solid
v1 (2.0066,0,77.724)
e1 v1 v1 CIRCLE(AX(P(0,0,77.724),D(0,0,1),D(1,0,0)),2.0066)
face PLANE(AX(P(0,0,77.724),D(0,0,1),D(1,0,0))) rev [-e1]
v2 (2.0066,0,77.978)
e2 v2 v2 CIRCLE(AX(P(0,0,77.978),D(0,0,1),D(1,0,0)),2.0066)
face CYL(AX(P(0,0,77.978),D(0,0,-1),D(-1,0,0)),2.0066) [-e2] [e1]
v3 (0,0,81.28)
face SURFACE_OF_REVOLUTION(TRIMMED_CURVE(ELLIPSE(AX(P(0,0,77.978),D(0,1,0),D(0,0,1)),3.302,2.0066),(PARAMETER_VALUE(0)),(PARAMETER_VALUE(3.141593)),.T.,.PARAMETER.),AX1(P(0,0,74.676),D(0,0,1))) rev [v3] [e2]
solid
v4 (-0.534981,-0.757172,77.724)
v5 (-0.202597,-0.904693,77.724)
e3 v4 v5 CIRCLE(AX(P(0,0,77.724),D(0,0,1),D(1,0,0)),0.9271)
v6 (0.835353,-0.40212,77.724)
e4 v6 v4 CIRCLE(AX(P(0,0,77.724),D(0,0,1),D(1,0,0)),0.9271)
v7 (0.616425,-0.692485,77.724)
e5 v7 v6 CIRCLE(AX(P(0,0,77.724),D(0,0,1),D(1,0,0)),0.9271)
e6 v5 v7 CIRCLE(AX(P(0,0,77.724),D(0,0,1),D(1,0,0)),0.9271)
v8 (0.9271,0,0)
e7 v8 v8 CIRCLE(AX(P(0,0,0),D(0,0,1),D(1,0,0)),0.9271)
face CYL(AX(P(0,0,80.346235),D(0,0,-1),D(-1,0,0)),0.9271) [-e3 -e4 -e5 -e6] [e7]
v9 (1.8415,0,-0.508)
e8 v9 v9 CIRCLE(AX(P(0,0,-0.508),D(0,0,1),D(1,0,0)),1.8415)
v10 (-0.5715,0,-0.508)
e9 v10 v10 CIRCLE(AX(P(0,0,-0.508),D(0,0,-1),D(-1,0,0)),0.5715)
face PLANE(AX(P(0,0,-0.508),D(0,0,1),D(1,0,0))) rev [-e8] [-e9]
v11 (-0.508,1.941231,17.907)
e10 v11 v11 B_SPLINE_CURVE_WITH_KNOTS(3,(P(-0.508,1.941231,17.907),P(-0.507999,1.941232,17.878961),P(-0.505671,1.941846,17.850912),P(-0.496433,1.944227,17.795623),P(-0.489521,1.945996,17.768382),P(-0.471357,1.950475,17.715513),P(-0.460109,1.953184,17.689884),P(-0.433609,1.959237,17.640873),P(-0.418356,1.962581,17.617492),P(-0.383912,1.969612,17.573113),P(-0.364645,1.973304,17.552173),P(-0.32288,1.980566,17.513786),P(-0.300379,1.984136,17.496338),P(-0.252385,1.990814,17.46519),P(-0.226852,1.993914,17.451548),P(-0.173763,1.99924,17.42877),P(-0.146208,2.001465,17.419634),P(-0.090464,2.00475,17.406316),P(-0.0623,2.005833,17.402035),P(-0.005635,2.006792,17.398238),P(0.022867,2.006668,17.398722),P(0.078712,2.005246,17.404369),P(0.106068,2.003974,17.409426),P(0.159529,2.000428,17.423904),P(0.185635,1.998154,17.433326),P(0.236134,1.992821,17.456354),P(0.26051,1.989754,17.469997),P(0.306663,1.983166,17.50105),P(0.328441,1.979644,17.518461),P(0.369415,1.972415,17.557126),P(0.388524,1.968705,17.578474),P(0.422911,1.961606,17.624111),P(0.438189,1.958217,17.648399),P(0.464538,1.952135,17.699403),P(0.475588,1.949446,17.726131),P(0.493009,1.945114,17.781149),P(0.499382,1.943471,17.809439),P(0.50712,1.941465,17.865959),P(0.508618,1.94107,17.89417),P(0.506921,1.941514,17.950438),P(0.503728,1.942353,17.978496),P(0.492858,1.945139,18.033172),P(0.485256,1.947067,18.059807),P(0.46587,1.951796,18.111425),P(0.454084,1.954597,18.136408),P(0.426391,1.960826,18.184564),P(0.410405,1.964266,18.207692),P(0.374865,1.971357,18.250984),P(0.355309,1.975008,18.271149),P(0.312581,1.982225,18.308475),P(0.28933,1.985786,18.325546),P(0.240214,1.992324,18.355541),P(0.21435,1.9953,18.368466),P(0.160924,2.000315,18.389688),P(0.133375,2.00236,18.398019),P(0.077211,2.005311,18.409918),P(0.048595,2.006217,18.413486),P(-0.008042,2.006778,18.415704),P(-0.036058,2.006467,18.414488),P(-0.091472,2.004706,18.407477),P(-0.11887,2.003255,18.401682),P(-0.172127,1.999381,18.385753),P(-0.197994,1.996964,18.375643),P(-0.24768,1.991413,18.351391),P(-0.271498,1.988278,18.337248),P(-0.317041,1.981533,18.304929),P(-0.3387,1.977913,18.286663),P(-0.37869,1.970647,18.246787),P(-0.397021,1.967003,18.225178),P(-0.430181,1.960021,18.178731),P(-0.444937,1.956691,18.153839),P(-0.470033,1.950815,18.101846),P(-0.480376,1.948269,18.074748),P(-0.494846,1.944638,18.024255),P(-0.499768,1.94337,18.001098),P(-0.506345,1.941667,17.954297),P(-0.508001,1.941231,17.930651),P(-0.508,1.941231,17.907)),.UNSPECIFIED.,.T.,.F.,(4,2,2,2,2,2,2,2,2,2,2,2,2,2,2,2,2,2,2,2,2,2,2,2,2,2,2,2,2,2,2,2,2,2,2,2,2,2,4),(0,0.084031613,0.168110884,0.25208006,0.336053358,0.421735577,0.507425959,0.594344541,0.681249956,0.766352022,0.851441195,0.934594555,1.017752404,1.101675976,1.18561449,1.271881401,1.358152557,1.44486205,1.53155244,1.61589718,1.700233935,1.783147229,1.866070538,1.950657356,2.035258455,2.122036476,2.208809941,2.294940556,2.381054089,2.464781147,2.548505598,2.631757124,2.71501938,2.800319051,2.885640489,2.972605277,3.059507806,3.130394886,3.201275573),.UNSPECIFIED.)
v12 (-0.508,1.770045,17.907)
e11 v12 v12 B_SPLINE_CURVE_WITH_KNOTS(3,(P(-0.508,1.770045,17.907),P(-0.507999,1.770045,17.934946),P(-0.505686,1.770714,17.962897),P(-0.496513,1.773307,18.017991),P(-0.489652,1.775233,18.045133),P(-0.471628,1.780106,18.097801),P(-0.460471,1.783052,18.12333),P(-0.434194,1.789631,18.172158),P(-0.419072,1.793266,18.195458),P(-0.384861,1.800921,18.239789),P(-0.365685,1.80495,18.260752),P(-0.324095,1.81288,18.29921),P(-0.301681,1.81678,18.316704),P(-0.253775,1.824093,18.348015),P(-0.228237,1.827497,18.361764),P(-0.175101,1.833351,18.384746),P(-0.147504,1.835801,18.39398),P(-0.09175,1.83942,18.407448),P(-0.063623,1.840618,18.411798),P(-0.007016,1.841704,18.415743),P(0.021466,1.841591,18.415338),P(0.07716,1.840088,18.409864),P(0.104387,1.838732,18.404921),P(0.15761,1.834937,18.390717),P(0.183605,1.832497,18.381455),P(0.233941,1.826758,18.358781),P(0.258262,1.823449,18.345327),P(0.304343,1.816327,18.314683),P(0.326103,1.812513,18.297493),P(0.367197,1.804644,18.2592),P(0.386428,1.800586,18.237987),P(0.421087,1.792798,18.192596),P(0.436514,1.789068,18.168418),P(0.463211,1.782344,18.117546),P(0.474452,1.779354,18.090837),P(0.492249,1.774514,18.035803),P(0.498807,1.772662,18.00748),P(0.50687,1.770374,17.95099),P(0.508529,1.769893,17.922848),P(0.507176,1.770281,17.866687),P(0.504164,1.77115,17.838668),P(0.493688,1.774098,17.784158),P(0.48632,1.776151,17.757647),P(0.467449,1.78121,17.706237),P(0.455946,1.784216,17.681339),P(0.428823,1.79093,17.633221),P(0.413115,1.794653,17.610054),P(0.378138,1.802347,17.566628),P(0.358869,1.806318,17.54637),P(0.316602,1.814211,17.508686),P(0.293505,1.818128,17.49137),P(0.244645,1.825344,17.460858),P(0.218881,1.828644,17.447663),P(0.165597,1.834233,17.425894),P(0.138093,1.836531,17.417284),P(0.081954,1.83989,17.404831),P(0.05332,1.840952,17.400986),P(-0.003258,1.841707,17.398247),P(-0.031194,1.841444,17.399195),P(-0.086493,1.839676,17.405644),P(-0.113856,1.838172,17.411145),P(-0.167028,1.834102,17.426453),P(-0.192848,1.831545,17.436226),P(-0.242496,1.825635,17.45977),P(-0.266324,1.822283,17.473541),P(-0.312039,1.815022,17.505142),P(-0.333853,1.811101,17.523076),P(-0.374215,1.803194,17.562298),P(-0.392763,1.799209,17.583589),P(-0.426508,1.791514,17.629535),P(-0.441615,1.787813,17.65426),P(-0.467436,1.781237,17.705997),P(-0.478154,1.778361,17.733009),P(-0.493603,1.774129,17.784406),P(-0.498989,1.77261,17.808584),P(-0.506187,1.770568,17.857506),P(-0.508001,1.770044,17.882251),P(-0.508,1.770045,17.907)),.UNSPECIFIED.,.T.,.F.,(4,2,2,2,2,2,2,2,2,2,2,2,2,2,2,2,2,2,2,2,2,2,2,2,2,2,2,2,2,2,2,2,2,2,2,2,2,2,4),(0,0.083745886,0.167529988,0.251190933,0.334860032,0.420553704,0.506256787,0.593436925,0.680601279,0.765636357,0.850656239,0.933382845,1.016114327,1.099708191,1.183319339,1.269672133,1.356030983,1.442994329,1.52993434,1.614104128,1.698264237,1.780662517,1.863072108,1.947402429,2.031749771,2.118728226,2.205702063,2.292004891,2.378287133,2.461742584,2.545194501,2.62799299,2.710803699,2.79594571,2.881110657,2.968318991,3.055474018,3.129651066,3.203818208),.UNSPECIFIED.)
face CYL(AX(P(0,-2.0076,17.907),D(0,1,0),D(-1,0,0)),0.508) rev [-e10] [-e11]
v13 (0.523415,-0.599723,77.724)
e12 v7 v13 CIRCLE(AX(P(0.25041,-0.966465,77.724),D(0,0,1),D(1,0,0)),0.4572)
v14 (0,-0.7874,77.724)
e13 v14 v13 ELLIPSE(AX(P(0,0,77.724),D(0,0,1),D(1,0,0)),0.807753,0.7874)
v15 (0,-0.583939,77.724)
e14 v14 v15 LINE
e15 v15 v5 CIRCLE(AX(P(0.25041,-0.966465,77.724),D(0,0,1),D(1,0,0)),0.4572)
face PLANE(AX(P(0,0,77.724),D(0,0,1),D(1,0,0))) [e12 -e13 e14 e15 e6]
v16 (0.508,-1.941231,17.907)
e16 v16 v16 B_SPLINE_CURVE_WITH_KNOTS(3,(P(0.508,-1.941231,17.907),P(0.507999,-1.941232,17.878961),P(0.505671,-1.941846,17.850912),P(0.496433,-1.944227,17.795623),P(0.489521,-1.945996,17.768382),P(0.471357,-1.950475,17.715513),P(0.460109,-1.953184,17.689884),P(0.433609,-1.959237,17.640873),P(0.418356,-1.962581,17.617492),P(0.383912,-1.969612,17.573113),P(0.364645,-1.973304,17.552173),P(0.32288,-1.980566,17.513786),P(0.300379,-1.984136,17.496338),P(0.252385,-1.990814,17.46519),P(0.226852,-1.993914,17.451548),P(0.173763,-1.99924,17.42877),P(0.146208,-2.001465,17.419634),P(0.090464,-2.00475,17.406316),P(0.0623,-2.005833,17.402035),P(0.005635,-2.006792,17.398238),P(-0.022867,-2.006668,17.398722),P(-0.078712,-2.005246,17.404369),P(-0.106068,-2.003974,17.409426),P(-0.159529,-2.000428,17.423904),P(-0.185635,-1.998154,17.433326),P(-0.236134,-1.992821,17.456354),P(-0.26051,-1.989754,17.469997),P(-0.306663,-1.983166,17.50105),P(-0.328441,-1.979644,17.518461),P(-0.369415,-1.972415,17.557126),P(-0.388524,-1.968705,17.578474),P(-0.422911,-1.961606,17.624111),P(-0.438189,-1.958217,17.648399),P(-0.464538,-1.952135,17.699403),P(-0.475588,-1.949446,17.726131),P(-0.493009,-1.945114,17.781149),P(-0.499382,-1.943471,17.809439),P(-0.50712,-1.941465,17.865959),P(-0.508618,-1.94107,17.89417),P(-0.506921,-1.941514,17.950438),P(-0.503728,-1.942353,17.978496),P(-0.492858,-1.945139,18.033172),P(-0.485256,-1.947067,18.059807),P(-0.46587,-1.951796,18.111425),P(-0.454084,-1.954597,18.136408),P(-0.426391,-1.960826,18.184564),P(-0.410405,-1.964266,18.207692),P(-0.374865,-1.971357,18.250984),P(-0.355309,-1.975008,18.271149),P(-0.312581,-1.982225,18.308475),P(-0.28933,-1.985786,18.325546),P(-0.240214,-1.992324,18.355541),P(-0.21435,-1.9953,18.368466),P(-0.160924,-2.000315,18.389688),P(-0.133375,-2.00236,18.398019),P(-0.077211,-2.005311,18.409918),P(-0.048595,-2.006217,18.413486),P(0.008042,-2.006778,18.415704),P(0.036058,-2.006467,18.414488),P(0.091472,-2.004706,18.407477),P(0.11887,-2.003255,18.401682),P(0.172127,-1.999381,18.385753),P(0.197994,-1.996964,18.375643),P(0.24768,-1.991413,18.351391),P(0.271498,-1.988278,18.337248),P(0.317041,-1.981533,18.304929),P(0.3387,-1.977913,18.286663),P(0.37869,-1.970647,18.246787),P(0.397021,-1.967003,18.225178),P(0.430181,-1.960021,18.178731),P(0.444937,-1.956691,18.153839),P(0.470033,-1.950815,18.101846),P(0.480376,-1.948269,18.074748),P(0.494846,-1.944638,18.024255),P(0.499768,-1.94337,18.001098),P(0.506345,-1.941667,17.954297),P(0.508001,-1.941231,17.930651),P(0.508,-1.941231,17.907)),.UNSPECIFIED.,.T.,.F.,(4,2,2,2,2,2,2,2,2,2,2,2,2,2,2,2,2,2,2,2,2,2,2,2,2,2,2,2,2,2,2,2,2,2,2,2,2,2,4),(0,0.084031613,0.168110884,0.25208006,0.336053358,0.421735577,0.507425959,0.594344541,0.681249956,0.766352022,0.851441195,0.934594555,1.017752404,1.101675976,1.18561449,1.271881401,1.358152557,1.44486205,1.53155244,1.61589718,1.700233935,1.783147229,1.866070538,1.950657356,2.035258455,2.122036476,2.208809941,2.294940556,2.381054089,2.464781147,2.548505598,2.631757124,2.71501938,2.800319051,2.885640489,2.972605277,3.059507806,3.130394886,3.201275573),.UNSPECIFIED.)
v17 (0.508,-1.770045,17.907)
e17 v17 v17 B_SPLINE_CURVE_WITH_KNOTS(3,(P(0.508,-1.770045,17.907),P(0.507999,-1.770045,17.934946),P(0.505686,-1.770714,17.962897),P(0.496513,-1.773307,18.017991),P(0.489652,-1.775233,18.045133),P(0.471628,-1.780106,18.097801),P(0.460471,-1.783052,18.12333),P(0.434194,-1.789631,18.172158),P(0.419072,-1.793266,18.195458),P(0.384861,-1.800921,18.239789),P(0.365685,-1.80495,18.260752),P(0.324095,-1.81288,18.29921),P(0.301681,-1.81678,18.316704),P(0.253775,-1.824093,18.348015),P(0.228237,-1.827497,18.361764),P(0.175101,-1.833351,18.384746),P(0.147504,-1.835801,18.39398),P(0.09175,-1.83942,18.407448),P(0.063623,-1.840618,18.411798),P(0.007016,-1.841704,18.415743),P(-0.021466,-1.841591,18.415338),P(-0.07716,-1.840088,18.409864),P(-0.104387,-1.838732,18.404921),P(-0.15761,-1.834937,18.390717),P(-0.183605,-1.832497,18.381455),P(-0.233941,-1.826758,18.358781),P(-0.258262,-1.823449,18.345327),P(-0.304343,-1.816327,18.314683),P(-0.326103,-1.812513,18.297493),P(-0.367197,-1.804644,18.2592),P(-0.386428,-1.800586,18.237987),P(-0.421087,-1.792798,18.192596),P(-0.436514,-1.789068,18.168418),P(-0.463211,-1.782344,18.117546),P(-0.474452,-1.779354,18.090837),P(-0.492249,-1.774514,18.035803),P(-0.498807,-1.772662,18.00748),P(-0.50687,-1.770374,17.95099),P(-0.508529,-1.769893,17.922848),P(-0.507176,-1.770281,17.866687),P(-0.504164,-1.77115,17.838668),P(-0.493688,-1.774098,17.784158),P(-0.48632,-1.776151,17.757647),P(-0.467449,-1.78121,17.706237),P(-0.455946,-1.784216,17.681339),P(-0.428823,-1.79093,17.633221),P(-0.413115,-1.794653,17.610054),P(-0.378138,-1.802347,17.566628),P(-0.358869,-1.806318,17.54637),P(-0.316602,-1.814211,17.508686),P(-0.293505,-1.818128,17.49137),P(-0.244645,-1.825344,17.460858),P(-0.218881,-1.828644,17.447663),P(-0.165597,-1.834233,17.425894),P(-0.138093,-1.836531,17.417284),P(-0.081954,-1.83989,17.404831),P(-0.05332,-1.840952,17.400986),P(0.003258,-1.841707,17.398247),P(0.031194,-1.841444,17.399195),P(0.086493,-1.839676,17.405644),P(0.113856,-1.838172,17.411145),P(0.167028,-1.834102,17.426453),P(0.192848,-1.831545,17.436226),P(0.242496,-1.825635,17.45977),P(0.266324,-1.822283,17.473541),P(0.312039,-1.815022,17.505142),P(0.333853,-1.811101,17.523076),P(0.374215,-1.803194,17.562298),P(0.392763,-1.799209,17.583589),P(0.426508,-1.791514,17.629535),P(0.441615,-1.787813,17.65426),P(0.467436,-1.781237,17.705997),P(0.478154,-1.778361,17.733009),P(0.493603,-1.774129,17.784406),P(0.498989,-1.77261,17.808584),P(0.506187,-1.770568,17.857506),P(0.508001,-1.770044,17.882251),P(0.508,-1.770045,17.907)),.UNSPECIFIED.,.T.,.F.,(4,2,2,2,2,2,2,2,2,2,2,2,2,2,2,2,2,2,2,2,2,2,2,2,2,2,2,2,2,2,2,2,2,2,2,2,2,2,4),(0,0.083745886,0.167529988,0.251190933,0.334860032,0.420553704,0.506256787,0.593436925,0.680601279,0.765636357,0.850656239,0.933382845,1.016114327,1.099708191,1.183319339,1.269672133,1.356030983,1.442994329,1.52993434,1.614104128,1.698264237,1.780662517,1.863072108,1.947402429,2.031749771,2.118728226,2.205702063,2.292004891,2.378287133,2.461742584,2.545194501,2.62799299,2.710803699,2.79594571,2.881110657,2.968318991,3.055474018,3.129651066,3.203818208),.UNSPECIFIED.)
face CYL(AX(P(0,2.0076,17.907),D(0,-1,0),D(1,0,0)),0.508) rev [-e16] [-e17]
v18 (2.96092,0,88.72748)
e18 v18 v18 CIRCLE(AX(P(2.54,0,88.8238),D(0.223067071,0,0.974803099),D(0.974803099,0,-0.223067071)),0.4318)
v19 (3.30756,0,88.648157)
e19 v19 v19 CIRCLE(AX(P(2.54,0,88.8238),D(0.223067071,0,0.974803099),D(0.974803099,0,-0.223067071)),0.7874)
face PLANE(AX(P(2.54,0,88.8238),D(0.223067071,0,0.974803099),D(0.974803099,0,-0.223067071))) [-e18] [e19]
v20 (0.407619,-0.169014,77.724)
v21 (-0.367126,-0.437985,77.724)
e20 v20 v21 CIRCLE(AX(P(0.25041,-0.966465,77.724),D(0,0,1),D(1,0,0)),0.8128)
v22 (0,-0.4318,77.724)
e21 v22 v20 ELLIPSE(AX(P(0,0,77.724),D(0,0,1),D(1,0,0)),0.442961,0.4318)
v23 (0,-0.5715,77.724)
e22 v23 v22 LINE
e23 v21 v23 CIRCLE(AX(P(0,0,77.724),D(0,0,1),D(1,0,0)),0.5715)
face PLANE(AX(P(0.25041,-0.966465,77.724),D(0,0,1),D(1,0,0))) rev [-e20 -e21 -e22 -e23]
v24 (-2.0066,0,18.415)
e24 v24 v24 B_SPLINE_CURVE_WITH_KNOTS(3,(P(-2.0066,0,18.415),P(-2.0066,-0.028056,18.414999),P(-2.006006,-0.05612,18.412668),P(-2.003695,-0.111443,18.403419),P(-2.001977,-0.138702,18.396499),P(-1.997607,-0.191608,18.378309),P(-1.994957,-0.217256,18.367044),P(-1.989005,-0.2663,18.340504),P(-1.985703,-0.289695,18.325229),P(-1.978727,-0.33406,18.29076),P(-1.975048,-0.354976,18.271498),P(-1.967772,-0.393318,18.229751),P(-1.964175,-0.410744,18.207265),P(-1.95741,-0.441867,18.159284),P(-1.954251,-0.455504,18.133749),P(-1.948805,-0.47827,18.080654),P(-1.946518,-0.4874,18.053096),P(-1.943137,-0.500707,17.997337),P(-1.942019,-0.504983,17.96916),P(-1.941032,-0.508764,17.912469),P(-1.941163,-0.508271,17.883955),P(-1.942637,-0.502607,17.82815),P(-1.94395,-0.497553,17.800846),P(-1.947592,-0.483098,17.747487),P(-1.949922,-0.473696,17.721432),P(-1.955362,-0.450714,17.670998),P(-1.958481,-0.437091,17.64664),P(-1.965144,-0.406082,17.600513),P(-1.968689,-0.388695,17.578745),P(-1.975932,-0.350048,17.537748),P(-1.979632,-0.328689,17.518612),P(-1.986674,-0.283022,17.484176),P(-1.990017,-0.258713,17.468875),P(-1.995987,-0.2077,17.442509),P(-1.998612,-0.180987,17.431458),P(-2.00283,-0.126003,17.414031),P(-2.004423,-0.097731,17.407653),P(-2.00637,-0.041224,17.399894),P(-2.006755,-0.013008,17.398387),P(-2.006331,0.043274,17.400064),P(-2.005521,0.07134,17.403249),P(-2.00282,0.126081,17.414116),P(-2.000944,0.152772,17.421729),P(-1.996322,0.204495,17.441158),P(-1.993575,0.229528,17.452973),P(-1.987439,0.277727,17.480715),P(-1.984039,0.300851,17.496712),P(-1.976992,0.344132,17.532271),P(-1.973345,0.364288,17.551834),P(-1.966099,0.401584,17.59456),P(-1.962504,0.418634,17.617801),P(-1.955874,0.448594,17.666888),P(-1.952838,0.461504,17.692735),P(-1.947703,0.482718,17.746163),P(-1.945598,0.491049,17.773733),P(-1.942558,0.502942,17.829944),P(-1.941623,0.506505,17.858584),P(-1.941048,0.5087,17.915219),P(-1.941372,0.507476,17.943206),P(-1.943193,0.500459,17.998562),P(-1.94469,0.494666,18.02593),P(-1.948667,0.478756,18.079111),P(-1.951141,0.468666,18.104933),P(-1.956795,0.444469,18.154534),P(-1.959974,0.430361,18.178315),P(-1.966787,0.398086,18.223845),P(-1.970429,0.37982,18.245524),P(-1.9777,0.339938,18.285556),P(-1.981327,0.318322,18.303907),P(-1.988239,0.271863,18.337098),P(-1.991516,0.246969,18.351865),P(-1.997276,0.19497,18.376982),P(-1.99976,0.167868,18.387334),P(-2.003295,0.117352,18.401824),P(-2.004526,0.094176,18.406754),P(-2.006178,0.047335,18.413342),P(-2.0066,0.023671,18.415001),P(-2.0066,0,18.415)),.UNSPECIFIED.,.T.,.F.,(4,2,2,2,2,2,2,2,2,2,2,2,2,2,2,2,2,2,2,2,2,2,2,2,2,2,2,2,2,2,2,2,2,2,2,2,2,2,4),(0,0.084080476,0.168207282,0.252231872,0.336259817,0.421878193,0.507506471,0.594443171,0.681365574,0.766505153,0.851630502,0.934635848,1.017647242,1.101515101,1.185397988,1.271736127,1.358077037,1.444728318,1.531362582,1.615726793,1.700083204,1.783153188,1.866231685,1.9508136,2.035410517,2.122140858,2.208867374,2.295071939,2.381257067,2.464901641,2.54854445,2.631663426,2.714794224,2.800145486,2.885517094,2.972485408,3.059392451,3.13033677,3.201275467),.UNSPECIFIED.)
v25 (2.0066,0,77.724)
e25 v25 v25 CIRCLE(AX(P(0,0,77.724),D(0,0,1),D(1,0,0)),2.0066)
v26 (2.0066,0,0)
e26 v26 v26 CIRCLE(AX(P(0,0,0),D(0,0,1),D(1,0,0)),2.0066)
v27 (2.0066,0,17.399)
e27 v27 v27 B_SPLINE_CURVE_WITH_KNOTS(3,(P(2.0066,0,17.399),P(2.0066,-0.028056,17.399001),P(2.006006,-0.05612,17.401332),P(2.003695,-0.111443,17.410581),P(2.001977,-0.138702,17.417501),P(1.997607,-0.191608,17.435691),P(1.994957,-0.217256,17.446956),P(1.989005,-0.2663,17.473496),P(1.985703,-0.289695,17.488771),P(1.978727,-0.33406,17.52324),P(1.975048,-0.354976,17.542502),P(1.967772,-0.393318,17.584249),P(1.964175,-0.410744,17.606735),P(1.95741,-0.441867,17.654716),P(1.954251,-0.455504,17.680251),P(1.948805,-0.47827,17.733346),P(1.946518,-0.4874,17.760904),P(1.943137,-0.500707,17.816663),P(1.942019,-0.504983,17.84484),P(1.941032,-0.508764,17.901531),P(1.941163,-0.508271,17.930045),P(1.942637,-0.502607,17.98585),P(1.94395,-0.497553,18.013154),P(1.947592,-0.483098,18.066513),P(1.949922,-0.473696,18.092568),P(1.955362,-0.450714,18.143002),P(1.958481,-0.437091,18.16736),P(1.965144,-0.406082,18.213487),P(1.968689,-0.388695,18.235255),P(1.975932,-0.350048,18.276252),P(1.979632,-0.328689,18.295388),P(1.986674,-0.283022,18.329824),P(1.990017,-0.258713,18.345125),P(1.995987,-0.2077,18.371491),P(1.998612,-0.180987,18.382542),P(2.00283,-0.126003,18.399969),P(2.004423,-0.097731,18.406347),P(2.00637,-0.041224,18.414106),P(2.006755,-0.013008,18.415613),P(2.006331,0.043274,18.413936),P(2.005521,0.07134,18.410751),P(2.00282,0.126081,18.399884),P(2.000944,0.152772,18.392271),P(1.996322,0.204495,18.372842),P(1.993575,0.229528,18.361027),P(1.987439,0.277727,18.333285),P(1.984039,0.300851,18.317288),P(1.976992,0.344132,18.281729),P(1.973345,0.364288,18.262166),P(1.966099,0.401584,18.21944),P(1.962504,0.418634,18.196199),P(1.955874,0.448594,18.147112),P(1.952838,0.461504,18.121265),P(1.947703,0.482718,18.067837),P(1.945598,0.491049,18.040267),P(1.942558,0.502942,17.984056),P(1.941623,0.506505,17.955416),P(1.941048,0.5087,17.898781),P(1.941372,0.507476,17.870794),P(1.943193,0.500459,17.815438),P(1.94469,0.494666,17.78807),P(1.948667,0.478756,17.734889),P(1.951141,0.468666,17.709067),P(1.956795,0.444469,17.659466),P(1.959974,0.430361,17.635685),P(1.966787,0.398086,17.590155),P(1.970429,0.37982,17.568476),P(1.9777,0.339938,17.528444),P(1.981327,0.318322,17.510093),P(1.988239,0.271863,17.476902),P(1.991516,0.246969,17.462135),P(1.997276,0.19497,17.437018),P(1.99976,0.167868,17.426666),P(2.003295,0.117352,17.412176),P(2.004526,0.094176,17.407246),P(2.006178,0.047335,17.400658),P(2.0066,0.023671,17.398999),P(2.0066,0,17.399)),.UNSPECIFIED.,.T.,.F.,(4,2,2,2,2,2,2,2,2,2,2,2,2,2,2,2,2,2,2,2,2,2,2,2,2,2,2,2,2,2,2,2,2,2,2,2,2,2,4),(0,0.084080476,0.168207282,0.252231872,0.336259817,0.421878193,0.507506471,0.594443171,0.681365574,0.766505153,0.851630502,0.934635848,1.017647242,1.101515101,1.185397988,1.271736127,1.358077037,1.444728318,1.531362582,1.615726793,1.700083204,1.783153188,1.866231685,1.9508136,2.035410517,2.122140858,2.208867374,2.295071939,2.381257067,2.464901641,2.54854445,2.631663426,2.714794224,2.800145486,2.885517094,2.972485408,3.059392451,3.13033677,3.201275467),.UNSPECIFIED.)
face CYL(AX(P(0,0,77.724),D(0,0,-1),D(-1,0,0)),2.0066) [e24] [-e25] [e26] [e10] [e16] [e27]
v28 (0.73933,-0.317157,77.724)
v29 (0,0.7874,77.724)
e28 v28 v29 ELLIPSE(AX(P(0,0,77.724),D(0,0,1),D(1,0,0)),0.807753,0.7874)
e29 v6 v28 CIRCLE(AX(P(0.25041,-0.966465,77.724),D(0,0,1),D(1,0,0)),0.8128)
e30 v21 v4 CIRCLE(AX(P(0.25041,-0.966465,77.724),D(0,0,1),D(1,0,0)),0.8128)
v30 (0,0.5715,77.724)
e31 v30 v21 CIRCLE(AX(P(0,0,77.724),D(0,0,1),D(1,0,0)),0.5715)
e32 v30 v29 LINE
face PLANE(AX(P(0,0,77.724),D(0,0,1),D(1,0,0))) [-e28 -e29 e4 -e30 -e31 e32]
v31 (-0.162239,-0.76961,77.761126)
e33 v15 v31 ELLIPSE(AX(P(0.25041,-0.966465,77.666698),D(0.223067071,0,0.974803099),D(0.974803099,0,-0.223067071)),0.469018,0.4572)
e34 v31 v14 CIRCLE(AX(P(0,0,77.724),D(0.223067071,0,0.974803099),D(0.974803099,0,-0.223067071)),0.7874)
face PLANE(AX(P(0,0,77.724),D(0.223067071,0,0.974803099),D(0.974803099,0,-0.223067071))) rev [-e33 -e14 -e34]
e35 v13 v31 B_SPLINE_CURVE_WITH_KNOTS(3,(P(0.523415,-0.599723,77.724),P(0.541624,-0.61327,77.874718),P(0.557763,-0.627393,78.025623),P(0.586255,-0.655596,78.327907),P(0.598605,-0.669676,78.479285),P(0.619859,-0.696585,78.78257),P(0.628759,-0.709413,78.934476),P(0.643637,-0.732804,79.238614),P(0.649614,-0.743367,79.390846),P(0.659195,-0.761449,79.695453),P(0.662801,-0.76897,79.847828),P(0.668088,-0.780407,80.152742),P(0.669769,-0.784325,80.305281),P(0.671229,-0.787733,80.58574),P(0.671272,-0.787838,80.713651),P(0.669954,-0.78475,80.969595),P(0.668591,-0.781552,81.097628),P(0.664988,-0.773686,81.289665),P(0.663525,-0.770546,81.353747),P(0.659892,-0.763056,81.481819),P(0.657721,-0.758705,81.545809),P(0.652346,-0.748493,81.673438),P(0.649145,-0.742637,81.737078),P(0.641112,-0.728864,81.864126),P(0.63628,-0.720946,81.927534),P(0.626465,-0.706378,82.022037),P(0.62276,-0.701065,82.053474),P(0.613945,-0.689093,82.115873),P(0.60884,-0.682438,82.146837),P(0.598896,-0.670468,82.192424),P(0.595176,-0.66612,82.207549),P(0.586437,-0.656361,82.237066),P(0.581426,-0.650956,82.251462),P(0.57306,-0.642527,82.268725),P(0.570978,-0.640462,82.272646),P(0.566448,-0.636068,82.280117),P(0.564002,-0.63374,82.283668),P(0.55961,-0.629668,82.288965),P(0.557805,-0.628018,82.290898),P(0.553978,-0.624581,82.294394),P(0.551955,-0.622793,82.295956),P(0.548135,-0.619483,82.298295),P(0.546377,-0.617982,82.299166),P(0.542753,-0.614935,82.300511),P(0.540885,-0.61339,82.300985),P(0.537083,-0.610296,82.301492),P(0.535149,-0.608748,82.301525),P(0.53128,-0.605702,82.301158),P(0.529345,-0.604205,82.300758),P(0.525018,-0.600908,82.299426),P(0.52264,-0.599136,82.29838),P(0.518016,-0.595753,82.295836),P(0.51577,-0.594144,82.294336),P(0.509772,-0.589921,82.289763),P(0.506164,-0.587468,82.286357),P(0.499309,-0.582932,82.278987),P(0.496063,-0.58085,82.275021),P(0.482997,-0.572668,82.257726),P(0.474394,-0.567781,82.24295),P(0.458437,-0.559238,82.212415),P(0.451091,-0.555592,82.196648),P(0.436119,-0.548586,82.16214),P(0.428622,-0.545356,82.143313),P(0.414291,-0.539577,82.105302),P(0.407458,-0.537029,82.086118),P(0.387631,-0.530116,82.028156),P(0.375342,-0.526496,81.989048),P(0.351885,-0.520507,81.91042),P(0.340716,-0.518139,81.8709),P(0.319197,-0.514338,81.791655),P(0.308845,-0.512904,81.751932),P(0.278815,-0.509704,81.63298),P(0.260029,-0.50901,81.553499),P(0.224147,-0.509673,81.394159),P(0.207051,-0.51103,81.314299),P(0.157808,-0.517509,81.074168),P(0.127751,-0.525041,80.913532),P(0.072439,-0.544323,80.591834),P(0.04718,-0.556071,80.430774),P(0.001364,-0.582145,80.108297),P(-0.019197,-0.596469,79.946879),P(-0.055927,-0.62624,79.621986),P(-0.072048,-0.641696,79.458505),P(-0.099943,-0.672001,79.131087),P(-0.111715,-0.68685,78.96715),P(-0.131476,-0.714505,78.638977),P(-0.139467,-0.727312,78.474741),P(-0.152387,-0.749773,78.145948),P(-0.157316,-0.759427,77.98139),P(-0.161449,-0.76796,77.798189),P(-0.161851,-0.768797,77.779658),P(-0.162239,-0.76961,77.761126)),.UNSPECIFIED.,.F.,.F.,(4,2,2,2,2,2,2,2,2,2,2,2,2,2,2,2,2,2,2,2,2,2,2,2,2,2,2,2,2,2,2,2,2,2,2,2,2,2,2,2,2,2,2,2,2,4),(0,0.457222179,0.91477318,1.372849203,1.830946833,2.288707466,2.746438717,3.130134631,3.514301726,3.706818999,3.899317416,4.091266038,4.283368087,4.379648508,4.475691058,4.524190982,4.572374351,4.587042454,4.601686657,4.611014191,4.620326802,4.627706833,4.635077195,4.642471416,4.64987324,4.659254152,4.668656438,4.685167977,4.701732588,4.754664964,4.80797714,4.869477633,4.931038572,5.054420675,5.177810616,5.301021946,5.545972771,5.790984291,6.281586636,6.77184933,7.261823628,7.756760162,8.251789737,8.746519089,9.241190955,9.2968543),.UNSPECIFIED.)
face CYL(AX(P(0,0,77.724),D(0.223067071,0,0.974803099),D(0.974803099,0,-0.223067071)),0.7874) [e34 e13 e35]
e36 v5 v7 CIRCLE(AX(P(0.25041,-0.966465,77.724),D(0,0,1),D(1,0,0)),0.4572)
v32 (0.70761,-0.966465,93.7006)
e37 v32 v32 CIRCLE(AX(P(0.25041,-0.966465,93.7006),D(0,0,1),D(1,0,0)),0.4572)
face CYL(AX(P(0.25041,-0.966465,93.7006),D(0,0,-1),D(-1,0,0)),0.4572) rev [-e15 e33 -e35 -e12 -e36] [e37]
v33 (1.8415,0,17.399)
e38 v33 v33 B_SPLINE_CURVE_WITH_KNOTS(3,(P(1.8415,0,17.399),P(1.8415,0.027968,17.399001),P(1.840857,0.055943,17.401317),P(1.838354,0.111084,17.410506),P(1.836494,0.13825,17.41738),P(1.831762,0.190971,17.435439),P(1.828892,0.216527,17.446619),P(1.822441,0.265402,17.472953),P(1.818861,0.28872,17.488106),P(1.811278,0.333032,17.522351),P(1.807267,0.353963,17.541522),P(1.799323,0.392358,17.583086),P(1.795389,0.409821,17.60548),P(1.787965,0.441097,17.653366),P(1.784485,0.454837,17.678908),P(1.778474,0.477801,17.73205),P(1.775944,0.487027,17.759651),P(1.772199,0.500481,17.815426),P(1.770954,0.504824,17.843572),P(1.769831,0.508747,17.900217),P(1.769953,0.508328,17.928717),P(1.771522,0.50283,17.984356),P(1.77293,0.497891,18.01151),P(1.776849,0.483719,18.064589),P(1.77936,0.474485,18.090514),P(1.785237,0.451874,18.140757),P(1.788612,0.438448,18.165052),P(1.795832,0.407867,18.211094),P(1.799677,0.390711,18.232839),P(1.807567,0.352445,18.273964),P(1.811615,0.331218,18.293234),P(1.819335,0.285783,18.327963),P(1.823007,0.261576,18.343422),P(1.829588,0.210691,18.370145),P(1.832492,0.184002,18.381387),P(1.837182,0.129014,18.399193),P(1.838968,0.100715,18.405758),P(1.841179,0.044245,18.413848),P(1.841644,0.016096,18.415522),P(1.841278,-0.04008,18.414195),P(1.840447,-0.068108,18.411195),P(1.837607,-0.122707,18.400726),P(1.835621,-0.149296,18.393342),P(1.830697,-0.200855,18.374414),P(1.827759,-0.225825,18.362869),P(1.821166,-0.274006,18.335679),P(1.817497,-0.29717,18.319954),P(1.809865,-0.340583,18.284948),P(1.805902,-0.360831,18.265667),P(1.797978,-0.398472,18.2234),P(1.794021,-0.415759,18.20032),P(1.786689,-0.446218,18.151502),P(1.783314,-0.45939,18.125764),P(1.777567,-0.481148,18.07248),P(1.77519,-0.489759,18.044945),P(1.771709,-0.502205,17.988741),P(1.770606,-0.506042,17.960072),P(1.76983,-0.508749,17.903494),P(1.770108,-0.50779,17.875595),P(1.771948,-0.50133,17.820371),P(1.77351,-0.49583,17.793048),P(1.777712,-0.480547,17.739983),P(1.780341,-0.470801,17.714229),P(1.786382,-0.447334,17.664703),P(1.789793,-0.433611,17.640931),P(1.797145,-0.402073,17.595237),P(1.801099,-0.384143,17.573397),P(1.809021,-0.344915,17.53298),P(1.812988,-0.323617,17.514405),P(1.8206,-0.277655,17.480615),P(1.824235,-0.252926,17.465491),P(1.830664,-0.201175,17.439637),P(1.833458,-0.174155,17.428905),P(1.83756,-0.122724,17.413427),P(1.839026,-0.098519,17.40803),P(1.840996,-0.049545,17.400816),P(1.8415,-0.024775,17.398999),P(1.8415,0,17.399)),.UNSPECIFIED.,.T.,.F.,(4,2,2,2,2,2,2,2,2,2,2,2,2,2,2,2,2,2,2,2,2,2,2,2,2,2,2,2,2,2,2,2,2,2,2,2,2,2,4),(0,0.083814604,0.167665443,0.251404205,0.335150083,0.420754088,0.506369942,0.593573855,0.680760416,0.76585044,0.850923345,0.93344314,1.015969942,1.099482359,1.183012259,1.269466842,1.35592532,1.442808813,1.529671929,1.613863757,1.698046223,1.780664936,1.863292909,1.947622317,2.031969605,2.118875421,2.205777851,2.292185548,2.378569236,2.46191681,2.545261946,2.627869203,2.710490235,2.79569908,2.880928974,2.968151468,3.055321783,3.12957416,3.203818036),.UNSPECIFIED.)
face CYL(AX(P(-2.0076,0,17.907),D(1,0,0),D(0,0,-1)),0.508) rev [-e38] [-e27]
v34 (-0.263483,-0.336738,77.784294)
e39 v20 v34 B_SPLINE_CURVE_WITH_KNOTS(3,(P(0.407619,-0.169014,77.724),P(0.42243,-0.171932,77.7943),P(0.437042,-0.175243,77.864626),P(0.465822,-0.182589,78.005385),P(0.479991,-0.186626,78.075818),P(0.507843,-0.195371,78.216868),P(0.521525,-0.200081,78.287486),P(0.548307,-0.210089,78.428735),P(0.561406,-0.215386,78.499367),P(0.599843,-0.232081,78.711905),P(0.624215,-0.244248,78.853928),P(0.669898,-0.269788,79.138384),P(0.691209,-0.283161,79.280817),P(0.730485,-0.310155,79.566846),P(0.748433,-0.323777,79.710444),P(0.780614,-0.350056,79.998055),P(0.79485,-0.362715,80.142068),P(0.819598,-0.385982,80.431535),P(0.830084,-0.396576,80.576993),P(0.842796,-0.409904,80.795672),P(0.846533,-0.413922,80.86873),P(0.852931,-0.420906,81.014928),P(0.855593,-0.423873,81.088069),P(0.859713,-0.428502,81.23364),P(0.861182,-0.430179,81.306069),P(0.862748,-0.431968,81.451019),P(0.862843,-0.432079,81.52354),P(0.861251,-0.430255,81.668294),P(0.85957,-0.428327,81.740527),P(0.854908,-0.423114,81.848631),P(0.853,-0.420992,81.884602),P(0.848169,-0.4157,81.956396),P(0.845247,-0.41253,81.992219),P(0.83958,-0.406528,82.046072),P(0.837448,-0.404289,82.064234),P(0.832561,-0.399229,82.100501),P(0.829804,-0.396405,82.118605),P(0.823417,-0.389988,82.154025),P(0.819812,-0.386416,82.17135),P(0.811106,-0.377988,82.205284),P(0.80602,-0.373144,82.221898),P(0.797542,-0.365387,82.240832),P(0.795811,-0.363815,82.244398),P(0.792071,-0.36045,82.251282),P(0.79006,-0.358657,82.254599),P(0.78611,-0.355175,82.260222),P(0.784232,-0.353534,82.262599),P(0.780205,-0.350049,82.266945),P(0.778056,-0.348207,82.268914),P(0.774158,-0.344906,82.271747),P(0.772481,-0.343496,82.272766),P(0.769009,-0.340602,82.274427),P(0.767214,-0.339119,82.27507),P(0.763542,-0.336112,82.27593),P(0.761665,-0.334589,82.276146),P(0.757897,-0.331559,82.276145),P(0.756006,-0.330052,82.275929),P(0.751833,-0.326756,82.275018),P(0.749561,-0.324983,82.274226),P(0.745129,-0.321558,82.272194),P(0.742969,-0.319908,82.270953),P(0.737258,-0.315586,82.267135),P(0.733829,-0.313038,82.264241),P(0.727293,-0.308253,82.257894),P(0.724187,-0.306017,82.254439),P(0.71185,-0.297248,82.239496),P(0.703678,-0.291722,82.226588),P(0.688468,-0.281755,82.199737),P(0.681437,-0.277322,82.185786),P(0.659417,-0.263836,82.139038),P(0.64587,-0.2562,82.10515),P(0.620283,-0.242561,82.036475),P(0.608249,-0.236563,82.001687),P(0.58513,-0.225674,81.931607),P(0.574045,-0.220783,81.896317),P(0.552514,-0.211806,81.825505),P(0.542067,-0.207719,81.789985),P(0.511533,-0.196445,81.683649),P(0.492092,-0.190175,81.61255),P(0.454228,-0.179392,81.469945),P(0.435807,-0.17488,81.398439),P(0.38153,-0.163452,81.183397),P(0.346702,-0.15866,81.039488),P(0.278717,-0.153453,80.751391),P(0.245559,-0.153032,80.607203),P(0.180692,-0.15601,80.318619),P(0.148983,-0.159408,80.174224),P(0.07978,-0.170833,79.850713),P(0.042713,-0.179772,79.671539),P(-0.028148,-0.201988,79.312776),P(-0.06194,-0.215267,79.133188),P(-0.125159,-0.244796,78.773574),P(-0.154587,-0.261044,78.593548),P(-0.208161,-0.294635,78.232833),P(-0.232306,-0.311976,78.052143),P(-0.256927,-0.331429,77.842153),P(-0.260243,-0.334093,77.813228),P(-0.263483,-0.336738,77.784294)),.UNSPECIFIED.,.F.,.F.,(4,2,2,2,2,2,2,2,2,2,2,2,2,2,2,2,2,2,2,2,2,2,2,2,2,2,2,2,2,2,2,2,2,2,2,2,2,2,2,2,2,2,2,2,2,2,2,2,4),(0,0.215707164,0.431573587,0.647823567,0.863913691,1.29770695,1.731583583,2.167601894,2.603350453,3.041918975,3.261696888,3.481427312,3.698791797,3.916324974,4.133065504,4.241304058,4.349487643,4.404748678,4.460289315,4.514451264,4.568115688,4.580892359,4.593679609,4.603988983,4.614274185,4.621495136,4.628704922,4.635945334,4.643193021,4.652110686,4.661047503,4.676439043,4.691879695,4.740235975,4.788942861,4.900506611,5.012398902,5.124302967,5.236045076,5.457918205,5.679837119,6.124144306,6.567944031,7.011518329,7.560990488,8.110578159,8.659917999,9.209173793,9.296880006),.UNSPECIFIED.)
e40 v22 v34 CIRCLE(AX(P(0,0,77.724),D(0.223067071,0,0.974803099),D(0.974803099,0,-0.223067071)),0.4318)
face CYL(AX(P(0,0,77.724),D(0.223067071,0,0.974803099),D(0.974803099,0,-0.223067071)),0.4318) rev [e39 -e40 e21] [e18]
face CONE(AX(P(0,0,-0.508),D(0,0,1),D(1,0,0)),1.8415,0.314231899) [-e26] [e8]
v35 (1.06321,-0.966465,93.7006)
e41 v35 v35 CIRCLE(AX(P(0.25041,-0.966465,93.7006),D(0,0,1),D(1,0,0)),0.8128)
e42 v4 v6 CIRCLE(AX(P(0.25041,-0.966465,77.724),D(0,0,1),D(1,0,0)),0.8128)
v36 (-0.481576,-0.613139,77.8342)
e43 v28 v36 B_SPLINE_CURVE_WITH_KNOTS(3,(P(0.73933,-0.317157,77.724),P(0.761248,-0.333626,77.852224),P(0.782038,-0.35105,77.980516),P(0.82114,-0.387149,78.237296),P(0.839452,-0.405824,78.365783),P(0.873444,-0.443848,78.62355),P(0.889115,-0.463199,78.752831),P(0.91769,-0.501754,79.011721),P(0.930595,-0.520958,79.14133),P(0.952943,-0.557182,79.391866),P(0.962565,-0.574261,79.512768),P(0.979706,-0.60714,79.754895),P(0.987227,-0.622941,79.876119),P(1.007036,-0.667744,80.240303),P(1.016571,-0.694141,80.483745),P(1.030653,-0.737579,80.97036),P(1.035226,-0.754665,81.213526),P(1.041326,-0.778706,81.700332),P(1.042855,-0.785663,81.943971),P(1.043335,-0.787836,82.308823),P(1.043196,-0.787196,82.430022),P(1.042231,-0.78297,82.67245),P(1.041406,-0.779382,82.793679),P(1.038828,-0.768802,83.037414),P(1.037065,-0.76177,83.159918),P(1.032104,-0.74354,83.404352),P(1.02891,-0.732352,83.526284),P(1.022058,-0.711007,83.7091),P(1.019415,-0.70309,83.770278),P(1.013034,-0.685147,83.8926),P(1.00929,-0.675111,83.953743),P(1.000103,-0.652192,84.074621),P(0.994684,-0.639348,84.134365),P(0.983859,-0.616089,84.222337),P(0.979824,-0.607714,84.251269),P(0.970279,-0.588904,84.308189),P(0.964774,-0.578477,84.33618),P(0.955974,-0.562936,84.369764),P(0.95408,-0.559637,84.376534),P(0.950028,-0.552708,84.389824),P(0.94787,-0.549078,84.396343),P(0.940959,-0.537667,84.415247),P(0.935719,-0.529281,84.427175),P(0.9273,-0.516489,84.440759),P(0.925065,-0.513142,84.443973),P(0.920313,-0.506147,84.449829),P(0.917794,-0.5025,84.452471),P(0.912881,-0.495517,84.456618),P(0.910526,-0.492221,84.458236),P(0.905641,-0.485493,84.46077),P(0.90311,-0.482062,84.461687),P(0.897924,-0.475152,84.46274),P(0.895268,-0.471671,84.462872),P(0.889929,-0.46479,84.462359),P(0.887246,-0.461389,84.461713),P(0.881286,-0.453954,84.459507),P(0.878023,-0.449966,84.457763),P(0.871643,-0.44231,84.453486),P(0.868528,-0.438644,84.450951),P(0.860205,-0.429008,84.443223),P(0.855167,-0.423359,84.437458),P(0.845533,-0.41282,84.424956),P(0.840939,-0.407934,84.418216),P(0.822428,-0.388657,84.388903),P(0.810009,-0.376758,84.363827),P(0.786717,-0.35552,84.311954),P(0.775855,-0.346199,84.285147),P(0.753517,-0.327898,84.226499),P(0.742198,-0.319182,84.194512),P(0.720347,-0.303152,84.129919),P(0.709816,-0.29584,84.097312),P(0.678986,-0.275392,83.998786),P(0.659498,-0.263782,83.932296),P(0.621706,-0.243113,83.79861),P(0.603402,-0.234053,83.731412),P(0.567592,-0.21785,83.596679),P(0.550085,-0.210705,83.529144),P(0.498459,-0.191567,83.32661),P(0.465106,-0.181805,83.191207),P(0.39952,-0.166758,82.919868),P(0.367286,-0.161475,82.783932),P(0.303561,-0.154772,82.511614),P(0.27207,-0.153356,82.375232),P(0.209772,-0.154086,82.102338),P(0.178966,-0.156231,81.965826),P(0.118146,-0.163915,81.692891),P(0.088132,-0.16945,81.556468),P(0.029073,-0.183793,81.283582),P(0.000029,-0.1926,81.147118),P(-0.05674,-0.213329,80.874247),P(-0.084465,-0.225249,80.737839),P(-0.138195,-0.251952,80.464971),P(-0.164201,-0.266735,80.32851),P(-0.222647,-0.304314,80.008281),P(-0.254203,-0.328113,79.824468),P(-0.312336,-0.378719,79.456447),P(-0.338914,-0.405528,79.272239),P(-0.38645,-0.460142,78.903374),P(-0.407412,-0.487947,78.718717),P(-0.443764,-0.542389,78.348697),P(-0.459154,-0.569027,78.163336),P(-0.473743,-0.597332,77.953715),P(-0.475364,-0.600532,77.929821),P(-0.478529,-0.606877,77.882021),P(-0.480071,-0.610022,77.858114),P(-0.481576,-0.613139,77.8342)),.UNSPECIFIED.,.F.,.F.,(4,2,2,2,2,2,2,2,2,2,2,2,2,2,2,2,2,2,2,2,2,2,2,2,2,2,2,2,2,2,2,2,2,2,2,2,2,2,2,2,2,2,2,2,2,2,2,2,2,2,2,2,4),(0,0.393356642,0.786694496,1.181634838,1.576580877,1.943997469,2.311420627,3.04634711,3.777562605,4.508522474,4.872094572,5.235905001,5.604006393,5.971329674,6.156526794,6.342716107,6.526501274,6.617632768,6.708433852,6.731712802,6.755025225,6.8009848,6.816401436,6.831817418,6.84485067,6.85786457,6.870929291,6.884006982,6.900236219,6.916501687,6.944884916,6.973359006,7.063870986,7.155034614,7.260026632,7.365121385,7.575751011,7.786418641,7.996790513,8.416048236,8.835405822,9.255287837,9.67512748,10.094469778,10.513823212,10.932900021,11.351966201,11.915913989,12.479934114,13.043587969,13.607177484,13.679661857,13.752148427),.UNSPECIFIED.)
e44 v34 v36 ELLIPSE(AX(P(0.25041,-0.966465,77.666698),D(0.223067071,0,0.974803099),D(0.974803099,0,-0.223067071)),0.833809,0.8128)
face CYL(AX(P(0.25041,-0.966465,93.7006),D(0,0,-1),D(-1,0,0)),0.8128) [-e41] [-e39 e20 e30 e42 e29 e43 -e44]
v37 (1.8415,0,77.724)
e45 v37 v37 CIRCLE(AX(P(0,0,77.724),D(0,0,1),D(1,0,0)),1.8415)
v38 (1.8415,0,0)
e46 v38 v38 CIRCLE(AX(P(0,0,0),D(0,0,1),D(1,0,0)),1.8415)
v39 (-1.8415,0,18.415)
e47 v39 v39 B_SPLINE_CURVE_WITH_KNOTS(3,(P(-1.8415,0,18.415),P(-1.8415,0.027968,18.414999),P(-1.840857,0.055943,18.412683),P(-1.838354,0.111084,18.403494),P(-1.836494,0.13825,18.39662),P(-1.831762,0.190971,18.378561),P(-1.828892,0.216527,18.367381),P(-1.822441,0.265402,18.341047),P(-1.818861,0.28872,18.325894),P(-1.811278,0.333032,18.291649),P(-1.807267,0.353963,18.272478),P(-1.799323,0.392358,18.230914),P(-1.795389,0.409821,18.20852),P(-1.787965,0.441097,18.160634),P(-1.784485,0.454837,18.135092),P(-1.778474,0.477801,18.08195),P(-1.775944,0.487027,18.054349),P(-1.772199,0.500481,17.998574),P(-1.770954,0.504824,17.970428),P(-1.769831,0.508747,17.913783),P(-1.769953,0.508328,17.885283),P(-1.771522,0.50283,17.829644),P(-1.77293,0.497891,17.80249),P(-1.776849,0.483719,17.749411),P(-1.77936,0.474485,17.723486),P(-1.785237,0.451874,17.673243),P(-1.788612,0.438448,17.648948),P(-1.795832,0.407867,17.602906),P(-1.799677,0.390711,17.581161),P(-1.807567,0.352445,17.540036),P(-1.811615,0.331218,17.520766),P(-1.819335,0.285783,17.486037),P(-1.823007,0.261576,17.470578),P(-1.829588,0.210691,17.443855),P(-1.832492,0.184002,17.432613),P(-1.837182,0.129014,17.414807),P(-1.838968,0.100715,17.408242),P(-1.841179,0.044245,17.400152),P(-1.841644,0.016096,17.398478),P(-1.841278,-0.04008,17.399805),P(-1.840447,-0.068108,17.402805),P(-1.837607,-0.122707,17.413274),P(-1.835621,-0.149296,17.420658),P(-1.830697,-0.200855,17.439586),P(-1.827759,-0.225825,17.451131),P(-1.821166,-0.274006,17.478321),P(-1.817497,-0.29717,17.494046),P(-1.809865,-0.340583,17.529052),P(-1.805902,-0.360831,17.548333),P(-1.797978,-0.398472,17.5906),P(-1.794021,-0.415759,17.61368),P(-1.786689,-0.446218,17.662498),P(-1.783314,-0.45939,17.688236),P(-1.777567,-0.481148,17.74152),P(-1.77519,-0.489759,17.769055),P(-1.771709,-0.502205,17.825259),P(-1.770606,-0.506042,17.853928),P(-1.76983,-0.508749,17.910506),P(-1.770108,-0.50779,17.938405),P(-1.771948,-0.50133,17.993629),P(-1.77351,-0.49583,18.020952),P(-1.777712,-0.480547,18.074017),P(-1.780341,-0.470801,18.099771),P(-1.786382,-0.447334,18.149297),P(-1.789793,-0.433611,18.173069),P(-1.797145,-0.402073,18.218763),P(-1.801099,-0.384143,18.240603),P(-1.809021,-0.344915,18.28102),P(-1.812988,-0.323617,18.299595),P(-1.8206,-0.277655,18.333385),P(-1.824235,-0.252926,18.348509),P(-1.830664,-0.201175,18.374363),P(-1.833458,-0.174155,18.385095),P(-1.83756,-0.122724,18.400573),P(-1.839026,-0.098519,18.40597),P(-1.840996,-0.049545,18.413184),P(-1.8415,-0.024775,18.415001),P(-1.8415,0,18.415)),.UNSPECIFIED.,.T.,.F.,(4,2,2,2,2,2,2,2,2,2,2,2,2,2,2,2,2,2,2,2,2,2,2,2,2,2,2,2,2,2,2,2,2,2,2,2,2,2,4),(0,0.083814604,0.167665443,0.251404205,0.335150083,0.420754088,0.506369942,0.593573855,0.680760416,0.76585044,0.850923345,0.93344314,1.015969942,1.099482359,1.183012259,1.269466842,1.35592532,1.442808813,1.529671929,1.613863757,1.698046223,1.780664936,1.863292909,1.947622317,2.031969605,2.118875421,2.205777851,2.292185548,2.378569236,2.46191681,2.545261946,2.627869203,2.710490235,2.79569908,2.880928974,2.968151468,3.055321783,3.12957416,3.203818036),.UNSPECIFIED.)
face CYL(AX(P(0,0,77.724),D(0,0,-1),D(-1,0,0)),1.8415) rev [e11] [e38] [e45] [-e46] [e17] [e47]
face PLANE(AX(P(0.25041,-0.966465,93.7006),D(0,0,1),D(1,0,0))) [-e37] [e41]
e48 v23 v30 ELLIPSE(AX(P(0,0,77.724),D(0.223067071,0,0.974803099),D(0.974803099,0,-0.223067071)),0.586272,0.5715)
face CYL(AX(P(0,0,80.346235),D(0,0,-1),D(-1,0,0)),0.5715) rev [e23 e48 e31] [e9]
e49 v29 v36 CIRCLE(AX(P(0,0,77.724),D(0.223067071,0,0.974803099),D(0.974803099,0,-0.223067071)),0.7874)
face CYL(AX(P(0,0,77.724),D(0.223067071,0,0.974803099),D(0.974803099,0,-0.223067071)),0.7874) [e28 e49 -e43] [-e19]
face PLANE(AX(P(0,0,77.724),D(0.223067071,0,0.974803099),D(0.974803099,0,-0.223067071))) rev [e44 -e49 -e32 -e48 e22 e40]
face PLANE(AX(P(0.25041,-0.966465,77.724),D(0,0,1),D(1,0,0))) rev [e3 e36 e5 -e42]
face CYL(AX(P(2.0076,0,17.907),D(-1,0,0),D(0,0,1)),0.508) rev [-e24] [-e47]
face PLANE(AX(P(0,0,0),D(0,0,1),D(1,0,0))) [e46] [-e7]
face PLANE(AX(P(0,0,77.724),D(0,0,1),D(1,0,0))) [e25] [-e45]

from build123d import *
from build123d.topology import SkipClean

# Parameters (mm, degrees)
SKETCH1_R               = 2.0066
SKETCH1_R_2             = 1.8415
BOSS_EXTRUDE1_DEPTH     = 77.724
CUT_EXTRUDE1_REACH      = 79.883
CUT_EXTRUDE1_END_RADIUS = 1.8415
SKETCH2_R               = 0.508
CIRPATTERN1_COUNT       = 4
SKETCH3_R               = 0.9271
SKETCH3_R_2             = 0.5715
BOSS_EXTRUDE2_DEPTH     = 77.724
CUT_EXTRUDE2_REACH      = 80.283
SKETCH6_R               = 0.5715
SKETCH7_R               = 0.8128
SKETCH7_R_2             = 0.4572
BOSS_EXTRUDE3_DEPTH     = 15.9766
SKETCH9_R               = 0.7874
SKETCH9_R_2             = 0.4318
SKETCH10_R              = 2.0066
BOSS_EXTRUDE4_DEPTH     = 0.254
DOME4_FACE_RADIUS       = 2.0066
DOME4_HEIGHT            = 3.302


# Read off the part's stored shape, not the designer's step: Loft1
with BuildPart() as part:
    # Sketch1 → Boss-Extrude1 (new body)
    with BuildSketch(Plane.XY):
        with Locations(Location((0, 0, 0), (0, 0, 180))):
            Circle(SKETCH1_R)
        with Locations(Location((0, 0, 0), (0, 0, 180))):
            Circle(SKETCH1_R_2, mode=Mode.SUBTRACT)
    extrude(amount=BOSS_EXTRUDE1_DEPTH)

    # Cut-Extrude1: up to this cylinder (the profile starts outside it)
    cut_extrude1_end = Plane(origin=(0, 0, 17.907), z_dir=(0, 0, -1)) * Cylinder(CUT_EXTRUDE1_END_RADIUS, 164.449, mode=Mode.PRIVATE)
    # Sketch2 → Cut-Extrude1 (cut, up to the surface)
    with BuildSketch(Plane(origin=(2.54, 0, 0), x_dir=(0, 0, -1), z_dir=(1, 0, 0)), mode=Mode.PRIVATE) as cut_extrude1_sk1:
        with Locations((-17.907, 0)):
            Circle(SKETCH2_R)
    cut_extrude1_tool1 = extrude(cut_extrude1_sk1.sketch, amount=-CUT_EXTRUDE1_REACH, mode=Mode.PRIVATE) - cut_extrude1_end
    cut_extrude1 = cut_extrude1_tool1.solids().sort_by_distance((2.54, 0, 17.907))[0]
    add(cut_extrude1, mode=Mode.SUBTRACT)

    # CirPattern1: Cut-Extrude1 ×4 about axis
    cirpattern1_axis = Axis((0, 0, 0), (0, 0, 1))
    for i in range(1, CIRPATTERN1_COUNT):
        add(cut_extrude1.rotate(cirpattern1_axis, i * 360 / CIRPATTERN1_COUNT), mode=Mode.SUBTRACT)



with BuildPart() as body_2:
    # Sketch3 → Boss-Extrude2 (new body)
    with BuildSketch(Plane.XY):
        Circle(SKETCH3_R)
        Circle(SKETCH3_R_2, mode=Mode.SUBTRACT)
    extrude(amount=BOSS_EXTRUDE2_DEPTH)


with BuildPart() as part_1:
    add(part.part)

    add(body_2.part)  # Loft1 merges body 2
    # Loft1 outline → Loft1 (revolve)
    with BuildSketch(Plane.XZ):
        Polygon((2.0066, 0), (0, 0), (0, -0.508), (1.8415, -0.508), align=None)
    revolve(axis=Axis((0, 0, 0), (0, 0, 1)))

    # Sketch6 → Cut-Extrude2 (cut, up to next)
    with BuildSketch(Plane(origin=(0, 0, -0.508), x_dir=(-1, 0, 0), z_dir=(0, 0, -1)), mode=Mode.PRIVATE) as cut_extrude2_sk1:
        Circle(SKETCH6_R)
    cut_extrude2_tool1 = extrude(cut_extrude2_sk1.sketch, amount=-CUT_EXTRUDE2_REACH, mode=Mode.PRIVATE) & part_1.part
    add(cut_extrude2_tool1.solids().sort_by_distance((0, 0, -0.508))[0], mode=Mode.SUBTRACT)

    # Sketch7 → Boss-Extrude3 (add)
    with SkipClean():  # the faces are left unmerged after this step: merging them gives an invalid solid
        with BuildSketch(Plane.XY.offset(77.724)):
            with Locations(Location((0.250410478, -0.966465499, 0), (0, 0, 165.078413954))):
                Circle(SKETCH7_R)
            with Locations(Location((0.250410478, -0.966465499, 0), (0, 0, 172.234948478))):
                Circle(SKETCH7_R_2, mode=Mode.SUBTRACT)
        extrude(amount=BOSS_EXTRUDE3_DEPTH)

    # Sweep1: sweep along a path in Sketch8
    with SkipClean():  # the faces are left unmerged after this step: merging them gives an invalid solid
        with BuildLine(Plane(origin=(0, 0, 0), x_dir=(1, 0, 0), z_dir=(0, 1, 0))) as sweep1_path:
            Line((0, -77.724), (2.54, -88.8238))
        # Sketch9 → Sweep1 (sweep)
        with BuildSketch(Plane(origin=(2.54, 0, 88.8238), x_dir=(0.9748030990707375, 0, -0.22306707072556928), z_dir=(0.22306707072556928, 0, 0.9748030990707375))):
            Circle(SKETCH9_R)
            Circle(SKETCH9_R_2, mode=Mode.SUBTRACT)
        sweep(path=sweep1_path.line)


with BuildPart() as body_2_2:
    # Sketch10 → Boss-Extrude4 (new body)
    with BuildSketch(Plane.XY.offset(77.724)):
        Circle(SKETCH10_R)
    extrude(amount=BOSS_EXTRUDE4_DEPTH)

    # Dome4: an elliptical dome of height H over a round flat face of radius A is half a spheroid: the quarter ellipse of half axes A and H revolved about the face's axis
    with BuildSketch(Plane((0, 0, 77.978), x_dir=(0, 1, 0), z_dir=(1, 0, 0)), mode=Mode.PRIVATE) as dome4_quarter:
        Ellipse(DOME4_FACE_RADIUS, DOME4_HEIGHT)
        Rectangle(DOME4_FACE_RADIUS, DOME4_HEIGHT, align=(Align.MIN, Align.MIN), mode=Mode.INTERSECT)
    revolve(dome4_quarter.sketch, axis=Axis((0, 0, 77.978), (0, 0, 1)))


solid = Compound([part_1.part, body_2_2.part])
